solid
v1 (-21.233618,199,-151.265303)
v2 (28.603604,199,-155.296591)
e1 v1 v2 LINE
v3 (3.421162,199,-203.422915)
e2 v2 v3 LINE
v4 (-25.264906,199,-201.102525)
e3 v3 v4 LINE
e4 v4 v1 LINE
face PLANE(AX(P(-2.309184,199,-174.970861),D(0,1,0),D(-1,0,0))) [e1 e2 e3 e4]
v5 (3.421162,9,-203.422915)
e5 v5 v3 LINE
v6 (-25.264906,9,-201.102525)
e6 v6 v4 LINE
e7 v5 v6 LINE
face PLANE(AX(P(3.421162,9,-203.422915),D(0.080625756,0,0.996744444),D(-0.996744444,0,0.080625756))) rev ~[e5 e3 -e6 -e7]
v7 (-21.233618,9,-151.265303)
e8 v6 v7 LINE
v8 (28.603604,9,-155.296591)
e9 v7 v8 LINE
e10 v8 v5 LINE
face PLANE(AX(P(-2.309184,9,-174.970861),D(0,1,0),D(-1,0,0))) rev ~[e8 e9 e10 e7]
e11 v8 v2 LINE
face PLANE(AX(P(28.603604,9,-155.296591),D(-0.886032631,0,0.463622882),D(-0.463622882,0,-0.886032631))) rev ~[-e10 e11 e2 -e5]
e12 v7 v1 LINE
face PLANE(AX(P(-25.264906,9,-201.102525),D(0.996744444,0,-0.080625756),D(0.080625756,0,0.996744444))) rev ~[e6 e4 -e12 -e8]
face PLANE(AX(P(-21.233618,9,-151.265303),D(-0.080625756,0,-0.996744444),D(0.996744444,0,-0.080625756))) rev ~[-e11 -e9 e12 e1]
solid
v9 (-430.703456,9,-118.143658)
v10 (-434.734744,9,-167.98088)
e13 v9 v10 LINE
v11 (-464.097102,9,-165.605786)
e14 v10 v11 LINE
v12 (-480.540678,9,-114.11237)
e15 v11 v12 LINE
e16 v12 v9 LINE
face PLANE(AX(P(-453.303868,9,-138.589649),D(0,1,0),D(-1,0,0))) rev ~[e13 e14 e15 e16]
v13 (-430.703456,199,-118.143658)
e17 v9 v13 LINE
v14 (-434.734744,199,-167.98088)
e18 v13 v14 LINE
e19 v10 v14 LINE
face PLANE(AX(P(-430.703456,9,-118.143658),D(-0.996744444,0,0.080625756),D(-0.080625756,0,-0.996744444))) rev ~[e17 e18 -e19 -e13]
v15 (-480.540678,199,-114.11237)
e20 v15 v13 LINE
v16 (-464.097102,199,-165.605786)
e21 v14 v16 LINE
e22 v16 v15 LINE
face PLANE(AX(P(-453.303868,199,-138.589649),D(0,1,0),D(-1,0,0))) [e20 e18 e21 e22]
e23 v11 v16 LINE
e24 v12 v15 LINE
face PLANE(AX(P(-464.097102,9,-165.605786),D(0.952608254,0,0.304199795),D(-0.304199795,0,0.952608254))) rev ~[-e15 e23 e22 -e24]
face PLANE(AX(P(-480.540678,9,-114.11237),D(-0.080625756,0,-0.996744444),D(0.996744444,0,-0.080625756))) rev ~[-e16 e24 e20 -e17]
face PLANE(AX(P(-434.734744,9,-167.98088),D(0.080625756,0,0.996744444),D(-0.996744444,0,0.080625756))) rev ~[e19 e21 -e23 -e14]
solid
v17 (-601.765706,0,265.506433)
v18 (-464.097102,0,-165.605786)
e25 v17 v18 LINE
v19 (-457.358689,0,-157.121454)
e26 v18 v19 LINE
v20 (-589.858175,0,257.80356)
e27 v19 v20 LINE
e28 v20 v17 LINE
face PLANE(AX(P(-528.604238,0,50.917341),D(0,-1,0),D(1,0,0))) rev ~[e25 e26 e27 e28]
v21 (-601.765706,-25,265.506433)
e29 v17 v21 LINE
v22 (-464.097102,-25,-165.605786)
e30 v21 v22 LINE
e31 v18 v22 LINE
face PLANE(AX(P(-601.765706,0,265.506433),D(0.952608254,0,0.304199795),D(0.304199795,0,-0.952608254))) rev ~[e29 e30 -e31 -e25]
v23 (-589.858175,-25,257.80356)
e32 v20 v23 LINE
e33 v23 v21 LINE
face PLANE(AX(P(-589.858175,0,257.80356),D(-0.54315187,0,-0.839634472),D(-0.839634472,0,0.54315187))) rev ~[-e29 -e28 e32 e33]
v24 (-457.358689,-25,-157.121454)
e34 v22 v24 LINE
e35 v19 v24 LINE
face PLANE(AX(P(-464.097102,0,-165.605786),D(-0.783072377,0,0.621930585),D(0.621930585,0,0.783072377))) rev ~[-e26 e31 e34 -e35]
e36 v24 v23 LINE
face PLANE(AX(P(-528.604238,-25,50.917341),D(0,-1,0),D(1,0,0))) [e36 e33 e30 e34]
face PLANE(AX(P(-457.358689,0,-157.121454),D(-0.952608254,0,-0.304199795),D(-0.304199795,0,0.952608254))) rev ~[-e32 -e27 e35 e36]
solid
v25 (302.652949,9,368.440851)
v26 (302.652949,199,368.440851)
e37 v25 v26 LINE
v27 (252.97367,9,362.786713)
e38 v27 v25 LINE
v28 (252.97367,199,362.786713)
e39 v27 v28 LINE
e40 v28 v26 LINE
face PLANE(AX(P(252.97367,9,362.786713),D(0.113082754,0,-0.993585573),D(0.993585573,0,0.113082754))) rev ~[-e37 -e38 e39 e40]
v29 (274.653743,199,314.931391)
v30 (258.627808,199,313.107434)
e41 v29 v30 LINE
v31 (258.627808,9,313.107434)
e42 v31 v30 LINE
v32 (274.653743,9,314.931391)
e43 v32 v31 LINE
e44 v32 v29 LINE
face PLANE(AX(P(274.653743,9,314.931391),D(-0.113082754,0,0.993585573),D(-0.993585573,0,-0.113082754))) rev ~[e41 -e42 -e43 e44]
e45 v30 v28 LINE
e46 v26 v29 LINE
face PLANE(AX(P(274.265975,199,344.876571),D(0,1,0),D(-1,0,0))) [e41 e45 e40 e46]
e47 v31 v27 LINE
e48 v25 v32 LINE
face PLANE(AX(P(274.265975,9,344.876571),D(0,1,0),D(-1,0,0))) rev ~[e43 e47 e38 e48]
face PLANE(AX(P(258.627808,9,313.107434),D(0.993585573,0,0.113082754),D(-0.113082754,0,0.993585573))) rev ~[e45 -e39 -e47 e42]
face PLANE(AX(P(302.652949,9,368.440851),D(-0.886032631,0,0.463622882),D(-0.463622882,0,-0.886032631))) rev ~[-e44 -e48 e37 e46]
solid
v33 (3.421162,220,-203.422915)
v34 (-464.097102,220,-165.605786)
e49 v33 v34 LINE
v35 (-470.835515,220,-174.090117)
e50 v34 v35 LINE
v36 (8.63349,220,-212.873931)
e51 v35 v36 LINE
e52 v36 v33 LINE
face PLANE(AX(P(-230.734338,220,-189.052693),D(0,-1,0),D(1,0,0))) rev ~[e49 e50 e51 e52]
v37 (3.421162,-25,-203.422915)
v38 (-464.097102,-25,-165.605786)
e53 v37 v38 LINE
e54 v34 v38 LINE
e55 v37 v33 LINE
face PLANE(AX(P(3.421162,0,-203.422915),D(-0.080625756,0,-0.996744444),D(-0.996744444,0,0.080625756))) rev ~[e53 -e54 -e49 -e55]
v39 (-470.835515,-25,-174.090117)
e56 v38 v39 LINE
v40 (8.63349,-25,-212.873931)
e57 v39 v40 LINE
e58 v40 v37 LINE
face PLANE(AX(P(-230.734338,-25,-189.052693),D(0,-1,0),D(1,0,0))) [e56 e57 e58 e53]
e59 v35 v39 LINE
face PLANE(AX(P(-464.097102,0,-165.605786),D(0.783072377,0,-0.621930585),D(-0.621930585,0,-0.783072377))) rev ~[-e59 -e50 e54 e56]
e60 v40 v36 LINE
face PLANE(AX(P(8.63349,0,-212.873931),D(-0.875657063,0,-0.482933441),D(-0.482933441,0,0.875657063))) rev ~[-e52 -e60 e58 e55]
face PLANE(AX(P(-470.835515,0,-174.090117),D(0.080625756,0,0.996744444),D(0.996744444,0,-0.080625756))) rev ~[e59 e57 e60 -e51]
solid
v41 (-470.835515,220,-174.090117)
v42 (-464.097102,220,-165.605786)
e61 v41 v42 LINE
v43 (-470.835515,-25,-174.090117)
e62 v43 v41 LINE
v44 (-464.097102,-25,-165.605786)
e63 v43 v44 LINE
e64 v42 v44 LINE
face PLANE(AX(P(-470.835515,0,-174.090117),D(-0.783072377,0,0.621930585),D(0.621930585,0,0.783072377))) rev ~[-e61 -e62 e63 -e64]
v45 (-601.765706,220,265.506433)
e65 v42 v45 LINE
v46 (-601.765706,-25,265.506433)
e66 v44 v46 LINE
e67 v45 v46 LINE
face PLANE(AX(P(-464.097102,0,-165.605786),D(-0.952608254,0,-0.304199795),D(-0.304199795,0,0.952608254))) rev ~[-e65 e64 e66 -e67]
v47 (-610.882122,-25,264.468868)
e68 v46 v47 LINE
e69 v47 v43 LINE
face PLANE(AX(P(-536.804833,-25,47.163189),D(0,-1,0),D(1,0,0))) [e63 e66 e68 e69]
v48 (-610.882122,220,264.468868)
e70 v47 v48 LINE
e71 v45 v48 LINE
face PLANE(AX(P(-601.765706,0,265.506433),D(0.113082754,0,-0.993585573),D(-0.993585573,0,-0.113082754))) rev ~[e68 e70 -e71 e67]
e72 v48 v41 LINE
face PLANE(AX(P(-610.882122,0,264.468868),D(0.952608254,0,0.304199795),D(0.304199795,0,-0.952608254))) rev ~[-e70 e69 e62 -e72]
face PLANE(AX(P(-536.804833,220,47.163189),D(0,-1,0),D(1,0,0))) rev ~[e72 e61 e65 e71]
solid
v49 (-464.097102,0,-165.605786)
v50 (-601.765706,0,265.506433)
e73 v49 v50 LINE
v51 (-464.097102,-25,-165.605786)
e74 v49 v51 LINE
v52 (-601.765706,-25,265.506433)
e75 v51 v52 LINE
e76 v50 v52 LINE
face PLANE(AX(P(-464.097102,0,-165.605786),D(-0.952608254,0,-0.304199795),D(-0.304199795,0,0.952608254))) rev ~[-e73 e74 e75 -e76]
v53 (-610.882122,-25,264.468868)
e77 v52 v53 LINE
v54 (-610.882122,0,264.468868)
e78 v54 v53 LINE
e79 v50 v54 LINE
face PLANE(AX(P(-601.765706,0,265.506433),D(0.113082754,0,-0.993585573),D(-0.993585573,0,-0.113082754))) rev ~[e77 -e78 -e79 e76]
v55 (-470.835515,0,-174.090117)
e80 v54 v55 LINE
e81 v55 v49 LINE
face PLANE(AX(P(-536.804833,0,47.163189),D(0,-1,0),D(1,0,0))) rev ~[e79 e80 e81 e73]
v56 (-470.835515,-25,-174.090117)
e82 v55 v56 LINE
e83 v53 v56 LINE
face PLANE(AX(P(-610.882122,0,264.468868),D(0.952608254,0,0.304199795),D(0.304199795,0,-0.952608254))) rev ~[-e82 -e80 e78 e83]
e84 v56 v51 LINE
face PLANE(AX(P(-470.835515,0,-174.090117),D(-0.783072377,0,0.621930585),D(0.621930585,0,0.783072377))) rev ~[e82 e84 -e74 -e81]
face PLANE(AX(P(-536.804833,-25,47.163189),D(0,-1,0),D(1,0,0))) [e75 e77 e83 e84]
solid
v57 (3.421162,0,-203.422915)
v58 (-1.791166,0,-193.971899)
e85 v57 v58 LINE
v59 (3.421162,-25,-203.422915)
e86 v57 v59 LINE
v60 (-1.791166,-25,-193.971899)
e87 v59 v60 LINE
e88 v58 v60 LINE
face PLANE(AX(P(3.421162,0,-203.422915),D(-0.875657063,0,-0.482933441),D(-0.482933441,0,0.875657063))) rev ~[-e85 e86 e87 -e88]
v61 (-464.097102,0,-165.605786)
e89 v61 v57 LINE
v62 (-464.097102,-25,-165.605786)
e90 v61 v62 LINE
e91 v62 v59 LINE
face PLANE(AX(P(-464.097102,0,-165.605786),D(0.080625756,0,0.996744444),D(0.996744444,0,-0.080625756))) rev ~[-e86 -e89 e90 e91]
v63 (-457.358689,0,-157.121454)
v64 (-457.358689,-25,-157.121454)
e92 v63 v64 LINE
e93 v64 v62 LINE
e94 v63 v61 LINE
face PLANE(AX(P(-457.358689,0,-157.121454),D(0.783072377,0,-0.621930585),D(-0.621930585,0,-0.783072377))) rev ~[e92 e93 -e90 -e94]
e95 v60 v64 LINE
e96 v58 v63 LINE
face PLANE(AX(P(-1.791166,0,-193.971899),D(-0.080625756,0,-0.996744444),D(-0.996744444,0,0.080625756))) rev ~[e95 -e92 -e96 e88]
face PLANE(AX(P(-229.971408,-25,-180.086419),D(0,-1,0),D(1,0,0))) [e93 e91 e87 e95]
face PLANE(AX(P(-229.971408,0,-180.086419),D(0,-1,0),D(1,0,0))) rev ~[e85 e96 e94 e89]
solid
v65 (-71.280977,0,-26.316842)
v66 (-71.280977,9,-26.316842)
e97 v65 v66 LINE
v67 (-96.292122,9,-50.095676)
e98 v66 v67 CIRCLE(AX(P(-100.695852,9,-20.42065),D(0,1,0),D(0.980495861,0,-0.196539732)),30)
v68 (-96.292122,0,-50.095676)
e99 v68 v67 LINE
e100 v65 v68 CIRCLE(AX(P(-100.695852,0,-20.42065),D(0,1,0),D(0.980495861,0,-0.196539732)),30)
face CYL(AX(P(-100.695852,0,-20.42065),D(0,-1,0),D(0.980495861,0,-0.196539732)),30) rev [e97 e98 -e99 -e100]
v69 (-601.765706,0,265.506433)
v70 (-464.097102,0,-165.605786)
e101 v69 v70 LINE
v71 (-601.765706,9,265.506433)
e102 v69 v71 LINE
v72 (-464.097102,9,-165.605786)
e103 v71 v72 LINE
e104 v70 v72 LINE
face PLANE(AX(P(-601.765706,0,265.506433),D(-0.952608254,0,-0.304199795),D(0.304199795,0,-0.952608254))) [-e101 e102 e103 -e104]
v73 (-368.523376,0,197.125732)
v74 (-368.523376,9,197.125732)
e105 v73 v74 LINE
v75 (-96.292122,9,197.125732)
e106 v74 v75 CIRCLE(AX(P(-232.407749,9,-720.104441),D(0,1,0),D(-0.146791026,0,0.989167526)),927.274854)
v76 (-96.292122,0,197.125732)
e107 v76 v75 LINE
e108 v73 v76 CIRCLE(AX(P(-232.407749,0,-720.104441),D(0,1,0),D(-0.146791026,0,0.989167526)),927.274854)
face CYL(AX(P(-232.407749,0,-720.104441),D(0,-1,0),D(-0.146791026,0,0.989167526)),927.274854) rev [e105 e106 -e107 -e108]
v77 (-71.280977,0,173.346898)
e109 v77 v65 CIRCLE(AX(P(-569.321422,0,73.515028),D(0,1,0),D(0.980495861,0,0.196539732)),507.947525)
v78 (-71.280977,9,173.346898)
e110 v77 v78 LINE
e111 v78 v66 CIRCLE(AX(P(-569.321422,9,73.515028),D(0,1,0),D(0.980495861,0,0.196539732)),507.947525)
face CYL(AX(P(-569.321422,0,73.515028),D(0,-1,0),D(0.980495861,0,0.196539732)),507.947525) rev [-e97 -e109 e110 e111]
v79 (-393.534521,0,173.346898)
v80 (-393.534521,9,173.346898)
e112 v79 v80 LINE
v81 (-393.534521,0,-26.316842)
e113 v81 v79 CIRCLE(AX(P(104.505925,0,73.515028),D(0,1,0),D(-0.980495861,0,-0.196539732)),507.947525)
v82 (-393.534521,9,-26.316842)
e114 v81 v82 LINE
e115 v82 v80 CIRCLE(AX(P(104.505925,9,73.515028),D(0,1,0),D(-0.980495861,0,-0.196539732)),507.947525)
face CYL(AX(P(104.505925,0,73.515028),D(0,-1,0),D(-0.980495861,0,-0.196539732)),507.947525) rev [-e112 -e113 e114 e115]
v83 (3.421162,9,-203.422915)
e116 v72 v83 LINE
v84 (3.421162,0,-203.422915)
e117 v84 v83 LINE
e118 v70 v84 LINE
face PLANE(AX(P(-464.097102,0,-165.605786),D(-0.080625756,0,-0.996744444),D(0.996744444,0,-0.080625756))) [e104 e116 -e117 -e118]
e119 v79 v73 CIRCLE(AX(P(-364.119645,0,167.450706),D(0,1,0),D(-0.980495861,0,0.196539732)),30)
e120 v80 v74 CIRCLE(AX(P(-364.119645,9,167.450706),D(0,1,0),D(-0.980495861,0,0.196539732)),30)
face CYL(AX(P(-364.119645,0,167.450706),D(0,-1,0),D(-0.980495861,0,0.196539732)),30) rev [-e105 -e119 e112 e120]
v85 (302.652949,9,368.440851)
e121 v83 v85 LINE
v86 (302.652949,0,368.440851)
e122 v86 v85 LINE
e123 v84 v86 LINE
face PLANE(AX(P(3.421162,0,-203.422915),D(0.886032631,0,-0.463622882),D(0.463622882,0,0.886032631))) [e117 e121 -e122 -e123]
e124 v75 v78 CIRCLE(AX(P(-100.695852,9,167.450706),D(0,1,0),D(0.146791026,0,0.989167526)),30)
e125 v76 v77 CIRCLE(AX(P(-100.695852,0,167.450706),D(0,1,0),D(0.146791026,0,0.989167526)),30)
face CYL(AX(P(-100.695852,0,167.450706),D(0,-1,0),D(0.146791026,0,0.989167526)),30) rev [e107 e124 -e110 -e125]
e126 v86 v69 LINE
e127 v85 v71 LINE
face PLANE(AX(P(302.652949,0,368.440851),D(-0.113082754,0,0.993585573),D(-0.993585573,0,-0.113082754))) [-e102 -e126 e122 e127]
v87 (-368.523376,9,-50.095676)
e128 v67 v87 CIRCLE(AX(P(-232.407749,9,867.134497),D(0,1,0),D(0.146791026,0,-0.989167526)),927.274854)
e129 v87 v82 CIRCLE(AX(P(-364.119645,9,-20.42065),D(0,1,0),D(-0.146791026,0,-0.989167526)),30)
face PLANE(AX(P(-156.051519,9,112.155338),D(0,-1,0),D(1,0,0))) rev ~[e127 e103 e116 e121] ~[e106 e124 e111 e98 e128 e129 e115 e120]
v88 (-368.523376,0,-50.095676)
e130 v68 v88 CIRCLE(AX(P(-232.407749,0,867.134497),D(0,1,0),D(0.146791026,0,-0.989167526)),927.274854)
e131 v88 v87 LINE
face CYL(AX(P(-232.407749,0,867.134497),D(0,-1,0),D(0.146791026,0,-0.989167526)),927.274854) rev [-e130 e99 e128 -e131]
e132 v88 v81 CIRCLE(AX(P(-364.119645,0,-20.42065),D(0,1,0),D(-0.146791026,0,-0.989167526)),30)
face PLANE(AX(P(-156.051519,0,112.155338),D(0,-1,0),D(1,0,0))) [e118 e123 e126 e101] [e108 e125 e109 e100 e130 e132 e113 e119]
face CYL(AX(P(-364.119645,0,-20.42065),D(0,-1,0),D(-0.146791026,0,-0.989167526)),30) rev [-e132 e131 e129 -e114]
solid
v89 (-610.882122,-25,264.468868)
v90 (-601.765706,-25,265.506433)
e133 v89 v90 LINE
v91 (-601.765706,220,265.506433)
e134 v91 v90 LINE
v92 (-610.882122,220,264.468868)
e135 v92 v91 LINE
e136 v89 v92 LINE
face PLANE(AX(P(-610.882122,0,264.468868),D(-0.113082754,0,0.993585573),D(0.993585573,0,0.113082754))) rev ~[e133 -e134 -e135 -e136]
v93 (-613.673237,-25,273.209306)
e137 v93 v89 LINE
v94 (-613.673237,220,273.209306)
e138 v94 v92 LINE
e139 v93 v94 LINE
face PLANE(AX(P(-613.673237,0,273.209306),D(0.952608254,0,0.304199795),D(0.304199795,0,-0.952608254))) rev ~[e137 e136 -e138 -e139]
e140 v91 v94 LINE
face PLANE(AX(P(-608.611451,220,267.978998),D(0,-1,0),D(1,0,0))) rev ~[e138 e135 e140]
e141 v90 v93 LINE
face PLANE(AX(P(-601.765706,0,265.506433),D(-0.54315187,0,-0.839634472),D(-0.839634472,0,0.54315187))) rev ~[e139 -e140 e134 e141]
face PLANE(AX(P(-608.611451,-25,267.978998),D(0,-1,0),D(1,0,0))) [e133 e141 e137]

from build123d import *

# Parameters (mm, degrees)
F2_DEPTH      = 9
F4_DEPTH      = 220
F4_DEPTH_BACK = 25
F5_DEPTH      = 220
F5_DEPTH_BACK = 25
F6_DEPTH      = 25
F7_DEPTH      = 25
F10_DEPTH     = 190


with BuildPart() as f2:
    # F1 (on Front) → F2 (new body)
    with BuildSketch(Plane.XZ):
        Polygon((-601.7657060729, 265.5064328389), (-464.0971021196, -165.605785879), (3.4211622742, -203.4229150402), (302.6529489276, 368.4408506737), align=None)
        with BuildLine():
            ThreePointArc((-71.2809765609, 173.3468978927), (-61.3738975589, 73.5150277615), (-71.2809765609, -26.3168423698))
            ThreePointArc((-71.2809765609, -26.3168423698), (-80.0250330385, -42.1627116629), (-96.2921216197, -50.0956762051))
            ThreePointArc((-96.2921216197, -50.0956762051), (-232.4077486992, -60.1403568485), (-368.5233757787, -50.0956762051))
            ThreePointArc((-368.5233757787, -50.0956762051), (-384.7904643599, -42.1627116629), (-393.5345208375, -26.3168423698))
            ThreePointArc((-393.5345208375, -26.3168423698), (-403.4415998395, 73.5150277615), (-393.5345208375, 173.3468978927))
            ThreePointArc((-393.5345208375, 173.3468978927), (-384.7904643599, 189.1927671858), (-368.5233757787, 197.125731728))
            ThreePointArc((-368.5233757787, 197.125731728), (-232.4077486992, 207.1704123714), (-96.2921216197, 197.125731728))
            ThreePointArc((-96.2921216197, 197.125731728), (-80.0250330385, 189.1927671858), (-71.2809765609, 173.3468978927))
        make_face(mode=Mode.SUBTRACT)
    extrude(amount=-F2_DEPTH)


with BuildPart() as f4:
    # F3 (on Front) → F4 (new body, two sides)
    with BuildSketch(Plane.XZ) as f4_sk:
        Polygon((3.4211622742, -203.4229150402), (-464.0971021196, -165.605785879), (-470.8355153758, -174.0901174304), (8.6334902122, -212.8739312278), align=None)
    extrude(amount=-F4_DEPTH)
    extrude(f4_sk.sketch, amount=F4_DEPTH_BACK)


with BuildPart() as f4b:
    # F3 (on Front) → F4, piece 2 (new body, two sides)
    with BuildSketch(Plane.XZ) as f4_2_sk:
        Polygon((-610.8821219424, 264.4688680396), (-601.7657060729, 265.5064328389), (-613.6732371829, 273.2093059424), align=None)
    extrude(amount=-F4_DEPTH)
    extrude(f4_2_sk.sketch, amount=F4_DEPTH_BACK)


with BuildPart() as f5:
    # F3 (on Front) → F5 (new body, two sides)
    with BuildSketch(Plane.XZ) as f5_sk:
        Polygon((-470.8355153758, -174.0901174304), (-464.0971021196, -165.605785879), (-601.7657060729, 265.5064328389), (-610.8821219424, 264.4688680396), align=None)
    extrude(amount=-F5_DEPTH)
    extrude(f5_sk.sketch, amount=F5_DEPTH_BACK)


with BuildPart() as f6:
    # F3 (on Front) → F6 (new body)
    with BuildSketch(Plane.XZ):
        Polygon((-601.7657060729, 265.5064328389), (-464.0971021196, -165.605785879), (-457.3586888634, -157.1214543275), (-589.8581749629, 257.8035597354), align=None)
    extrude(amount=F6_DEPTH)


with BuildPart() as f7:
    # F3 (on Front) → F7 (new body)
    with BuildSketch(Plane.XZ):
        Polygon((-457.3586888634, -157.1214543275), (-464.0971021196, -165.605785879), (3.4211622742, -203.4229150402), (-1.7911656639, -193.9718988526), align=None)
    extrude(amount=F7_DEPTH)


with BuildPart() as f7b:
    # F3 (on Front) → F7, piece 2 (new body)
    with BuildSketch(Plane.XZ):
        Polygon((-470.8355153758, -174.0901174304), (-464.0971021196, -165.605785879), (-601.7657060729, 265.5064328389), (-610.8821219424, 264.4688680396), align=None)
    extrude(amount=F7_DEPTH)


with BuildPart() as f10:
    # F9 (on face) → F10 (new body)
    with BuildSketch(Plane(origin=(0, 9, 0), x_dir=(-1, 0, 0), z_dir=(0, 1, 0))):
        Polygon((-302.6529489276, 368.4408506737), (-274.6537431194, 314.9313908348), (-258.6278079955, 313.1074343152), (-252.9736702823, 362.7867129605), align=None)
    extrude(amount=F10_DEPTH)


with BuildPart() as f10b:
    # F9 (on face) → F10, piece 2 (new body)
    with BuildSketch(Plane(origin=(0, 9, 0), x_dir=(-1, 0, 0), z_dir=(0, 1, 0))):
        Polygon((-28.6036041985, -155.2965905285), (-3.4211622742, -203.4229150402), (25.2649058109, -201.1025249624), (21.2336180232, -151.2653027407), align=None)
    extrude(amount=F10_DEPTH)


with BuildPart() as f10c:
    # F9 (on face) → F10, piece 3 (new body)
    with BuildSketch(Plane(origin=(0, 9, 0), x_dir=(-1, 0, 0), z_dir=(0, 1, 0))):
        Polygon((430.7034560891, -118.1436582337), (434.7347438769, -167.9808804554), (464.0971021196, -165.605785879), (480.5406783108, -114.112370446), align=None)
    extrude(amount=F10_DEPTH)


solid = Compound([f2.part, f4.part, f4b.part, f5.part, f6.part, f7.part, f7b.part, f10.part, f10b.part, f10c.part])
